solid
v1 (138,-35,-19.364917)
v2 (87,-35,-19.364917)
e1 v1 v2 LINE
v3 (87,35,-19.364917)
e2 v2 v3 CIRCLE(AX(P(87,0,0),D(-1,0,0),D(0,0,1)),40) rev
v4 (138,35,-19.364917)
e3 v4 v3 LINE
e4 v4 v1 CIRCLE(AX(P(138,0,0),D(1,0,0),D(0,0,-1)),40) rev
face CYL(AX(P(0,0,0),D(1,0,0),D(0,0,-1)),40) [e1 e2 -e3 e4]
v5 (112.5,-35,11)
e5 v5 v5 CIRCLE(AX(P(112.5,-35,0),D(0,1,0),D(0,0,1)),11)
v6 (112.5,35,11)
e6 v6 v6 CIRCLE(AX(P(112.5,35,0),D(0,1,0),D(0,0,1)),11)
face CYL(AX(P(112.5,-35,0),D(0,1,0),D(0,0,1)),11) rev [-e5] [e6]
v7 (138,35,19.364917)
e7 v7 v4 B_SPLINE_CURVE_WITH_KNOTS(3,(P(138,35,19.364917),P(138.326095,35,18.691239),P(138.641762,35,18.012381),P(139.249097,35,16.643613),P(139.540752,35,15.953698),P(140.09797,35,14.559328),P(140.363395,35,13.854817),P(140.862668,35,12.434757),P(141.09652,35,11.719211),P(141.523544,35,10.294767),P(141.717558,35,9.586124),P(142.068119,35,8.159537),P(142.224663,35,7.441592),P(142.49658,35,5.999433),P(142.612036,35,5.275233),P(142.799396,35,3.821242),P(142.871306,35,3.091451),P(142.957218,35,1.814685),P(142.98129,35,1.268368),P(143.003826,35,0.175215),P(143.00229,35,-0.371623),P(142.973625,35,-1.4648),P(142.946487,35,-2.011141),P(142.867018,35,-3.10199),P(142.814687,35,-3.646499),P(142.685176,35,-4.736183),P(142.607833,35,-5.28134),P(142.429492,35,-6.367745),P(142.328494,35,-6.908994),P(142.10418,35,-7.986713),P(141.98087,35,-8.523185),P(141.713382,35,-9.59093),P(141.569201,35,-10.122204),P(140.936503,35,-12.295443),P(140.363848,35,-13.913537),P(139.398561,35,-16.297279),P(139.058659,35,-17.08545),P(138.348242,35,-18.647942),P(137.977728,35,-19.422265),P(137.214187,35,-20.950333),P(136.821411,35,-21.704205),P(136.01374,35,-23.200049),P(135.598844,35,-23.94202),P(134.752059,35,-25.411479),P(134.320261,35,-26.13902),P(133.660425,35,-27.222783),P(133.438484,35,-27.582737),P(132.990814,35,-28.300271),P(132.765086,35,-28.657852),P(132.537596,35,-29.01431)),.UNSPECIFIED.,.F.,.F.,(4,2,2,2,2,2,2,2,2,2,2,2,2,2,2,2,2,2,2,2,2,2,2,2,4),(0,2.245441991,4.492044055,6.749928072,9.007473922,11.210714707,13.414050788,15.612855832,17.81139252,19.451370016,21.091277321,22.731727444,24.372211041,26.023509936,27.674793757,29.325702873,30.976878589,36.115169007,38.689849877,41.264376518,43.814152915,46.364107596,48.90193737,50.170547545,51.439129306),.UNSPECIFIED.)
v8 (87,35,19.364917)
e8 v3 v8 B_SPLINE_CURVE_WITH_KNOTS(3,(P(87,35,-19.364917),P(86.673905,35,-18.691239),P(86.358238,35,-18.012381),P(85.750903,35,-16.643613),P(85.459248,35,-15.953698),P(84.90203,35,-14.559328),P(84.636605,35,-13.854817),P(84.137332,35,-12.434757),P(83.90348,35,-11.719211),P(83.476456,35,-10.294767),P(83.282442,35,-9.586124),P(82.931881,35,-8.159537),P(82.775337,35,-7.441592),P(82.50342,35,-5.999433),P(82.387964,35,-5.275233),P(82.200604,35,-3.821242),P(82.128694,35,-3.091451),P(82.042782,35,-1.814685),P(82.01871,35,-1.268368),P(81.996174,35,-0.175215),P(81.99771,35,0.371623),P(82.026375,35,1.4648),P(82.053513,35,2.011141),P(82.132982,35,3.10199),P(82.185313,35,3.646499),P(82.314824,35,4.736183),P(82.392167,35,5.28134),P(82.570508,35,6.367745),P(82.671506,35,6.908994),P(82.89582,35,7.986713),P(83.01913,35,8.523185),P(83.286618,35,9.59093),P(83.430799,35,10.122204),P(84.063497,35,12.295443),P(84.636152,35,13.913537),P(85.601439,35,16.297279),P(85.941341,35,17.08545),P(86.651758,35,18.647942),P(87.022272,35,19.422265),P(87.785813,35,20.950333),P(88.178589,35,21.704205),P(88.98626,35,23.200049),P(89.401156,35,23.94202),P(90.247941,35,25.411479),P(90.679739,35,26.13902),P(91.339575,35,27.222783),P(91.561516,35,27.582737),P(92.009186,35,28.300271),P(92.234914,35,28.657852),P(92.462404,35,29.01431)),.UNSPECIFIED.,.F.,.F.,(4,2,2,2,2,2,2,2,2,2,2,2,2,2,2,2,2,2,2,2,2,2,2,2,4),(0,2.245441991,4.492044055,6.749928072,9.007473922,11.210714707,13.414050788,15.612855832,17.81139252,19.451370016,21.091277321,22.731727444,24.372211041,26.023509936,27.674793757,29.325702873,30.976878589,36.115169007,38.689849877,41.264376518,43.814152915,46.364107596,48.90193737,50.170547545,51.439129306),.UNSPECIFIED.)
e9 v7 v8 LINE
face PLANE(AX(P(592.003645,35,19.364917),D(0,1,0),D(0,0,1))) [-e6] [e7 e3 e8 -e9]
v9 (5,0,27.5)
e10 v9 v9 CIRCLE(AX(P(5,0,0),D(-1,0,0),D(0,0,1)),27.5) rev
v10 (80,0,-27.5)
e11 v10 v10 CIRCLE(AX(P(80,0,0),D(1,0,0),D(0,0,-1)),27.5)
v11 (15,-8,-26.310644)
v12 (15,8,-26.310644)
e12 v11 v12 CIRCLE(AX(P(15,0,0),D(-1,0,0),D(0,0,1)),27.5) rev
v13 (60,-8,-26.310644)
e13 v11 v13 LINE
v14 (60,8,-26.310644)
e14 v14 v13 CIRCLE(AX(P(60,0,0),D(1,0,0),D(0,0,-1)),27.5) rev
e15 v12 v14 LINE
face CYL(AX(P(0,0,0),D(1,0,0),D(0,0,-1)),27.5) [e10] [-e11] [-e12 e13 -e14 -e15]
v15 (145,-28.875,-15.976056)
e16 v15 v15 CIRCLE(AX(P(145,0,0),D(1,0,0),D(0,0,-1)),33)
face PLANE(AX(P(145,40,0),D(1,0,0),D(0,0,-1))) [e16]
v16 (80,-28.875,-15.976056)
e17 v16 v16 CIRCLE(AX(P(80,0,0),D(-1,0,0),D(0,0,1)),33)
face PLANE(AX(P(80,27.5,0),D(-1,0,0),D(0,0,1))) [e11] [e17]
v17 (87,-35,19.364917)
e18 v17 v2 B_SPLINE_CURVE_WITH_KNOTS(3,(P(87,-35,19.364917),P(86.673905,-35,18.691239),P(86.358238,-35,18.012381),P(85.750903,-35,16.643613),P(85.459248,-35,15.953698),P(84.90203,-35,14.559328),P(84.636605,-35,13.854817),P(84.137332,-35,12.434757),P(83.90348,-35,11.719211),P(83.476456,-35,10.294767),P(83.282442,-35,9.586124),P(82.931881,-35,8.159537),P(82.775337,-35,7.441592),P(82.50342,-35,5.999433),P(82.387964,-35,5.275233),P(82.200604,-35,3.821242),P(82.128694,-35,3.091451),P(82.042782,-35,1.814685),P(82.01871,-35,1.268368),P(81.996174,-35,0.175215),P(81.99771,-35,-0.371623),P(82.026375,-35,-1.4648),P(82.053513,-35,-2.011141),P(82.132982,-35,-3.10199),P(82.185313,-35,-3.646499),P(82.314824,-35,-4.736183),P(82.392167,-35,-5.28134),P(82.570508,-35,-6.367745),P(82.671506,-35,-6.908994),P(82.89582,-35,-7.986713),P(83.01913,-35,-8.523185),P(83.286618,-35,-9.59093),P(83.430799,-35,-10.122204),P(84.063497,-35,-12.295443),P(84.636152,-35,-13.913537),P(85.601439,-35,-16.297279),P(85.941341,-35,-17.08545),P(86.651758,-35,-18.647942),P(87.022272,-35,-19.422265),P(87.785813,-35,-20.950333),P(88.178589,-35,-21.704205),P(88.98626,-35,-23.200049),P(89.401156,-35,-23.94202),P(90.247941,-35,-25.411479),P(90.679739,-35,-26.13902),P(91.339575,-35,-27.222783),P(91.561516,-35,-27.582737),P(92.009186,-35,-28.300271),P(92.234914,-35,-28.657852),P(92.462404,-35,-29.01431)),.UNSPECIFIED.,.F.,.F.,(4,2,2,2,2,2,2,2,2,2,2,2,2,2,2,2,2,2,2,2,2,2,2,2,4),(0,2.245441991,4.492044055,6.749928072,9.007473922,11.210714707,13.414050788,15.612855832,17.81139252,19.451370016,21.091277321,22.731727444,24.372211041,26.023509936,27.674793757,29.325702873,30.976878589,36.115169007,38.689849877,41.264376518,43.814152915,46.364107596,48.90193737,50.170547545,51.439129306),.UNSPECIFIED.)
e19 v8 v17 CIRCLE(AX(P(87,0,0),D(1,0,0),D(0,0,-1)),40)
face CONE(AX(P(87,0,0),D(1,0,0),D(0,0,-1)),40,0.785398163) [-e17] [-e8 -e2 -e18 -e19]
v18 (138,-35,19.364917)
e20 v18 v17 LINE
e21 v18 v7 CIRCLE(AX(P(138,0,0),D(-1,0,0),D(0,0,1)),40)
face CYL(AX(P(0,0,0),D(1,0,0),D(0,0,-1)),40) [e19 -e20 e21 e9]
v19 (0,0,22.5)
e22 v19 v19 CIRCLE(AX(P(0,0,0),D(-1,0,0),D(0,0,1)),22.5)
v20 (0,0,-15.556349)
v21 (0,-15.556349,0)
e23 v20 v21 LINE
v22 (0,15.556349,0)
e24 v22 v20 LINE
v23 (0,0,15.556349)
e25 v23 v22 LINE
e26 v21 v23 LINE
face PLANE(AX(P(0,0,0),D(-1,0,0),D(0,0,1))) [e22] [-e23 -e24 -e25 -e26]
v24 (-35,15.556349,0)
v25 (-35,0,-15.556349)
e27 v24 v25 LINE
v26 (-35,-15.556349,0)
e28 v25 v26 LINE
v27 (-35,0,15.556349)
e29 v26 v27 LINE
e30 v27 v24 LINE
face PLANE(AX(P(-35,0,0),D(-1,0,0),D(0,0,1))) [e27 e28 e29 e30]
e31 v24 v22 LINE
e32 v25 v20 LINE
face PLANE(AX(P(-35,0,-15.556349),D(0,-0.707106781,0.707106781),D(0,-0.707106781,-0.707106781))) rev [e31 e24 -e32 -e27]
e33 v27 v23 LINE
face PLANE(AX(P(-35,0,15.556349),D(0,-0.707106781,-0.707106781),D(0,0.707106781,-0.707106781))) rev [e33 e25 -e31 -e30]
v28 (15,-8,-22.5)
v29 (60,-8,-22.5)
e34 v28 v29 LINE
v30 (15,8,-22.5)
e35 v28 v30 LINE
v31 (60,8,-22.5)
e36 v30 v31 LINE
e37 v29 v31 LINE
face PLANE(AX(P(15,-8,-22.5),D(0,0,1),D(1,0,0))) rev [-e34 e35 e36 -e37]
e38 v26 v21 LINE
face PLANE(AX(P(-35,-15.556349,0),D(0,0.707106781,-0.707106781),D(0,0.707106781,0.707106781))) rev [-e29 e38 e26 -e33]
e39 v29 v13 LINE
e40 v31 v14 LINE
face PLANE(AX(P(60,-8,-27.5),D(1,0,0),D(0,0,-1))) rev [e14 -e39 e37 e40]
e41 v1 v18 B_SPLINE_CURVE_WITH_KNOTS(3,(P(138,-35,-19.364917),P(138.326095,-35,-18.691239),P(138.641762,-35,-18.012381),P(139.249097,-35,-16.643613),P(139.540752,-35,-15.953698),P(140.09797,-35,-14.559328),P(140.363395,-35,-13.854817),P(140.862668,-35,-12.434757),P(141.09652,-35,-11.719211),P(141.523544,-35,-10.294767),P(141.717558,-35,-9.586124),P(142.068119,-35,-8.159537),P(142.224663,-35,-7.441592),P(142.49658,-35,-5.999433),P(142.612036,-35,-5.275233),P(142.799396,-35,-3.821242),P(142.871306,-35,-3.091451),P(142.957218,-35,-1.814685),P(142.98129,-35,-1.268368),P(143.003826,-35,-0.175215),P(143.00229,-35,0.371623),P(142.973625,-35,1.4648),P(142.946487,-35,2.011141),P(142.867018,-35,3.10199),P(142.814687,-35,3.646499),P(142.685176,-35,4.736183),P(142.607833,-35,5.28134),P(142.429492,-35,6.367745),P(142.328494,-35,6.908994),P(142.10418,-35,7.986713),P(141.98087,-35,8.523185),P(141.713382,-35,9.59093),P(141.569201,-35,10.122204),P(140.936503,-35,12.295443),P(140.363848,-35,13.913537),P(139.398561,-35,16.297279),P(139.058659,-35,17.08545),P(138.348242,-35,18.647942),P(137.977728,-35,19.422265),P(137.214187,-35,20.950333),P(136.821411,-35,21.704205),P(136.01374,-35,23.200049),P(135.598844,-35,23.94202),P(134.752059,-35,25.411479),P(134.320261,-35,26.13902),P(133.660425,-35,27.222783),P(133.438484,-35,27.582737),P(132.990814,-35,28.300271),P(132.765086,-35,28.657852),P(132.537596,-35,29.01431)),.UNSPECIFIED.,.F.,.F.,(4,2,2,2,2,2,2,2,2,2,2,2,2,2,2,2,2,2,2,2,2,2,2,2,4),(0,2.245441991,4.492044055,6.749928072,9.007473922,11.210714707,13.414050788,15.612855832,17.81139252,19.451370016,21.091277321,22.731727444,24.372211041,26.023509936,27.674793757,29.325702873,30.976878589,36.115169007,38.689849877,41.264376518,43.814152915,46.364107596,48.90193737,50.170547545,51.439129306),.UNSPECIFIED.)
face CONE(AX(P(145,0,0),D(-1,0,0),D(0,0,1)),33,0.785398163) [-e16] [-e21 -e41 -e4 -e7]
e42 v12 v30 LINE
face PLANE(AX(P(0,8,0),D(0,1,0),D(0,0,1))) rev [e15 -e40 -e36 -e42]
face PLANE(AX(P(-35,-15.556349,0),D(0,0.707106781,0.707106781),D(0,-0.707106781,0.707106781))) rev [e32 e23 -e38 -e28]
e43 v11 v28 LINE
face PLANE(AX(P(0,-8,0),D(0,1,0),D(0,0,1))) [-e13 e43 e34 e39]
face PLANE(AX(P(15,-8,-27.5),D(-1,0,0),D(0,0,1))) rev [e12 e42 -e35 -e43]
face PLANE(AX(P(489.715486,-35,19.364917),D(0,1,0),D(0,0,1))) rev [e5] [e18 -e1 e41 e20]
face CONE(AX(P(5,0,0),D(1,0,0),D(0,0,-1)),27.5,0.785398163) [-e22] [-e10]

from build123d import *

# Parameters (mm, degrees)
EXTRUDE_1_DEPTH          = 35
SKETCH_4_W               = 45.00000000000001
SKETCH_4_H               = 5
CUT_EXTRUDE_1_DEPTH      = 8
CUT_EXTRUDE_2_DEPTH      = 189.67962264113208
CUT_EXTRUDE_3_DEPTH      = 166.90660023037057
CUT_EXTRUDE_3_DEPTH_BACK = 166.90660023037057
SKETCH_6_R               = 10.999999999999993
CHAMFER_1_SIZE           = 7
CHAMFER_2_SIZE           = 5


with BuildPart() as part:
    # Эскиз1 → Повернуть1 (revolve)
    with BuildSketch(Plane.XY, mode=Mode.PRIVATE) as revolve_1_sk:
        Polygon((0, 0), (0, 27.5), (80, 27.500000000000004), (80, 40.00000000000001), (145, 40.00000000000001), (145, 1e-17), align=None)
    revolve(revolve_1_sk.sketch.rotate(Axis((0, 0, 0), (-1, 0, 0)), 90), axis=Axis((0, 0, 0), (-1, 0, 0)))

    # Эскиз3 → Бобышка-Вытянуть1 (add)
    with BuildSketch(Plane.ZY):
        Polygon((-1.63e-15, -15.556349186104034), (-15.556349186104049, 8.31e-15), (-6.49e-15, 15.55634918610405), (15.55634918610404, 8.54e-15), align=None)
    extrude(amount=EXTRUDE_1_DEPTH)

    # Эскиз4 → Вырез-Вытянуть1 (cut, symmetric)
    with BuildSketch(Plane(origin=(0, 0, 0), x_dir=(1, 0, 0), z_dir=(0, 1, 0))):
        with Locations((37.50000000000001, 25.000000000000004)):
            Rectangle(SKETCH_4_W, SKETCH_4_H)
    extrude(amount=CUT_EXTRUDE_1_DEPTH, both=True, mode=Mode.SUBTRACT)

    # Эскиз5 → Вырез-Вытянуть2 (cut, symmetric)
    with BuildSketch(Plane(origin=(145, 0, 0), x_dir=(0, 0, -1), z_dir=(1, 0, 0))):
        Polygon((-220.66774826766613, 35), (-19.364916731037095, 35), (19.364916731037095, 35), (220.66774826766613, 35), (220.66774826766613, 437.6056630732581), (-220.66774826766613, 437.6056630732581), align=None)
    cut_extrude_2 = extrude(amount=CUT_EXTRUDE_2_DEPTH, both=True, mode=Mode.SUBTRACT)

    # Зеркальное отражение1: Вырез-Вытянуть2 across plane
    add(cut_extrude_2.mirror(Plane.ZX), mode=Mode.SUBTRACT)

    # Эскиз6 → Вырез-Вытянуть3 (cut, two sides: drawn at the far end of the back side and taken through both)
    with BuildSketch(Plane(origin=(0, 35, 0), x_dir=(1, 0, 0), z_dir=(0, 1, 0)).offset(-CUT_EXTRUDE_3_DEPTH_BACK)):
        with Locations(Location((112.5, 0, 0), (0, 0, 270))):
            Circle(SKETCH_6_R)
    extrude(amount=CUT_EXTRUDE_3_DEPTH + CUT_EXTRUDE_3_DEPTH_BACK, mode=Mode.SUBTRACT)

    # Фаска1
    chamfer_1_edges = [part.edges().sort_by_distance(p)[0] for p in [
        (80, 3.55e-15, -40.00000000000001),
    ]]
    chamfer(chamfer_1_edges, length=CHAMFER_1_SIZE)
    chamfer_1_2_edges = [part.edges().sort_by_distance(p)[0] for p in [
        (80, -1.421e-14, 40.000000000000014),
    ]]
    chamfer(chamfer_1_2_edges, length=CHAMFER_1_SIZE - 0.0001)  # a hair under: the kernel refuses the full size
    chamfer_1_3_edges = [part.edges().sort_by_distance(p)[0] for p in [
        (145, 3.55e-15, -40.00000000000001),
    ]]
    chamfer(chamfer_1_3_edges, length=CHAMFER_1_SIZE)
    chamfer_1_4_edges = [part.edges().sort_by_distance(p)[0] for p in [
        (145, -1.421e-14, 40.000000000000014),
    ]]
    chamfer(chamfer_1_4_edges, length=CHAMFER_1_SIZE - 0.0001)  # a hair under: the kernel refuses the full size

    # Фаска2
    chamfer_2_edges = [part.edges().sort_by_distance(p)[0] for p in [
        (0, -6.42e-15, 27.5),
    ]]
    chamfer(chamfer_2_edges, length=CHAMFER_2_SIZE)


solid = part.part
